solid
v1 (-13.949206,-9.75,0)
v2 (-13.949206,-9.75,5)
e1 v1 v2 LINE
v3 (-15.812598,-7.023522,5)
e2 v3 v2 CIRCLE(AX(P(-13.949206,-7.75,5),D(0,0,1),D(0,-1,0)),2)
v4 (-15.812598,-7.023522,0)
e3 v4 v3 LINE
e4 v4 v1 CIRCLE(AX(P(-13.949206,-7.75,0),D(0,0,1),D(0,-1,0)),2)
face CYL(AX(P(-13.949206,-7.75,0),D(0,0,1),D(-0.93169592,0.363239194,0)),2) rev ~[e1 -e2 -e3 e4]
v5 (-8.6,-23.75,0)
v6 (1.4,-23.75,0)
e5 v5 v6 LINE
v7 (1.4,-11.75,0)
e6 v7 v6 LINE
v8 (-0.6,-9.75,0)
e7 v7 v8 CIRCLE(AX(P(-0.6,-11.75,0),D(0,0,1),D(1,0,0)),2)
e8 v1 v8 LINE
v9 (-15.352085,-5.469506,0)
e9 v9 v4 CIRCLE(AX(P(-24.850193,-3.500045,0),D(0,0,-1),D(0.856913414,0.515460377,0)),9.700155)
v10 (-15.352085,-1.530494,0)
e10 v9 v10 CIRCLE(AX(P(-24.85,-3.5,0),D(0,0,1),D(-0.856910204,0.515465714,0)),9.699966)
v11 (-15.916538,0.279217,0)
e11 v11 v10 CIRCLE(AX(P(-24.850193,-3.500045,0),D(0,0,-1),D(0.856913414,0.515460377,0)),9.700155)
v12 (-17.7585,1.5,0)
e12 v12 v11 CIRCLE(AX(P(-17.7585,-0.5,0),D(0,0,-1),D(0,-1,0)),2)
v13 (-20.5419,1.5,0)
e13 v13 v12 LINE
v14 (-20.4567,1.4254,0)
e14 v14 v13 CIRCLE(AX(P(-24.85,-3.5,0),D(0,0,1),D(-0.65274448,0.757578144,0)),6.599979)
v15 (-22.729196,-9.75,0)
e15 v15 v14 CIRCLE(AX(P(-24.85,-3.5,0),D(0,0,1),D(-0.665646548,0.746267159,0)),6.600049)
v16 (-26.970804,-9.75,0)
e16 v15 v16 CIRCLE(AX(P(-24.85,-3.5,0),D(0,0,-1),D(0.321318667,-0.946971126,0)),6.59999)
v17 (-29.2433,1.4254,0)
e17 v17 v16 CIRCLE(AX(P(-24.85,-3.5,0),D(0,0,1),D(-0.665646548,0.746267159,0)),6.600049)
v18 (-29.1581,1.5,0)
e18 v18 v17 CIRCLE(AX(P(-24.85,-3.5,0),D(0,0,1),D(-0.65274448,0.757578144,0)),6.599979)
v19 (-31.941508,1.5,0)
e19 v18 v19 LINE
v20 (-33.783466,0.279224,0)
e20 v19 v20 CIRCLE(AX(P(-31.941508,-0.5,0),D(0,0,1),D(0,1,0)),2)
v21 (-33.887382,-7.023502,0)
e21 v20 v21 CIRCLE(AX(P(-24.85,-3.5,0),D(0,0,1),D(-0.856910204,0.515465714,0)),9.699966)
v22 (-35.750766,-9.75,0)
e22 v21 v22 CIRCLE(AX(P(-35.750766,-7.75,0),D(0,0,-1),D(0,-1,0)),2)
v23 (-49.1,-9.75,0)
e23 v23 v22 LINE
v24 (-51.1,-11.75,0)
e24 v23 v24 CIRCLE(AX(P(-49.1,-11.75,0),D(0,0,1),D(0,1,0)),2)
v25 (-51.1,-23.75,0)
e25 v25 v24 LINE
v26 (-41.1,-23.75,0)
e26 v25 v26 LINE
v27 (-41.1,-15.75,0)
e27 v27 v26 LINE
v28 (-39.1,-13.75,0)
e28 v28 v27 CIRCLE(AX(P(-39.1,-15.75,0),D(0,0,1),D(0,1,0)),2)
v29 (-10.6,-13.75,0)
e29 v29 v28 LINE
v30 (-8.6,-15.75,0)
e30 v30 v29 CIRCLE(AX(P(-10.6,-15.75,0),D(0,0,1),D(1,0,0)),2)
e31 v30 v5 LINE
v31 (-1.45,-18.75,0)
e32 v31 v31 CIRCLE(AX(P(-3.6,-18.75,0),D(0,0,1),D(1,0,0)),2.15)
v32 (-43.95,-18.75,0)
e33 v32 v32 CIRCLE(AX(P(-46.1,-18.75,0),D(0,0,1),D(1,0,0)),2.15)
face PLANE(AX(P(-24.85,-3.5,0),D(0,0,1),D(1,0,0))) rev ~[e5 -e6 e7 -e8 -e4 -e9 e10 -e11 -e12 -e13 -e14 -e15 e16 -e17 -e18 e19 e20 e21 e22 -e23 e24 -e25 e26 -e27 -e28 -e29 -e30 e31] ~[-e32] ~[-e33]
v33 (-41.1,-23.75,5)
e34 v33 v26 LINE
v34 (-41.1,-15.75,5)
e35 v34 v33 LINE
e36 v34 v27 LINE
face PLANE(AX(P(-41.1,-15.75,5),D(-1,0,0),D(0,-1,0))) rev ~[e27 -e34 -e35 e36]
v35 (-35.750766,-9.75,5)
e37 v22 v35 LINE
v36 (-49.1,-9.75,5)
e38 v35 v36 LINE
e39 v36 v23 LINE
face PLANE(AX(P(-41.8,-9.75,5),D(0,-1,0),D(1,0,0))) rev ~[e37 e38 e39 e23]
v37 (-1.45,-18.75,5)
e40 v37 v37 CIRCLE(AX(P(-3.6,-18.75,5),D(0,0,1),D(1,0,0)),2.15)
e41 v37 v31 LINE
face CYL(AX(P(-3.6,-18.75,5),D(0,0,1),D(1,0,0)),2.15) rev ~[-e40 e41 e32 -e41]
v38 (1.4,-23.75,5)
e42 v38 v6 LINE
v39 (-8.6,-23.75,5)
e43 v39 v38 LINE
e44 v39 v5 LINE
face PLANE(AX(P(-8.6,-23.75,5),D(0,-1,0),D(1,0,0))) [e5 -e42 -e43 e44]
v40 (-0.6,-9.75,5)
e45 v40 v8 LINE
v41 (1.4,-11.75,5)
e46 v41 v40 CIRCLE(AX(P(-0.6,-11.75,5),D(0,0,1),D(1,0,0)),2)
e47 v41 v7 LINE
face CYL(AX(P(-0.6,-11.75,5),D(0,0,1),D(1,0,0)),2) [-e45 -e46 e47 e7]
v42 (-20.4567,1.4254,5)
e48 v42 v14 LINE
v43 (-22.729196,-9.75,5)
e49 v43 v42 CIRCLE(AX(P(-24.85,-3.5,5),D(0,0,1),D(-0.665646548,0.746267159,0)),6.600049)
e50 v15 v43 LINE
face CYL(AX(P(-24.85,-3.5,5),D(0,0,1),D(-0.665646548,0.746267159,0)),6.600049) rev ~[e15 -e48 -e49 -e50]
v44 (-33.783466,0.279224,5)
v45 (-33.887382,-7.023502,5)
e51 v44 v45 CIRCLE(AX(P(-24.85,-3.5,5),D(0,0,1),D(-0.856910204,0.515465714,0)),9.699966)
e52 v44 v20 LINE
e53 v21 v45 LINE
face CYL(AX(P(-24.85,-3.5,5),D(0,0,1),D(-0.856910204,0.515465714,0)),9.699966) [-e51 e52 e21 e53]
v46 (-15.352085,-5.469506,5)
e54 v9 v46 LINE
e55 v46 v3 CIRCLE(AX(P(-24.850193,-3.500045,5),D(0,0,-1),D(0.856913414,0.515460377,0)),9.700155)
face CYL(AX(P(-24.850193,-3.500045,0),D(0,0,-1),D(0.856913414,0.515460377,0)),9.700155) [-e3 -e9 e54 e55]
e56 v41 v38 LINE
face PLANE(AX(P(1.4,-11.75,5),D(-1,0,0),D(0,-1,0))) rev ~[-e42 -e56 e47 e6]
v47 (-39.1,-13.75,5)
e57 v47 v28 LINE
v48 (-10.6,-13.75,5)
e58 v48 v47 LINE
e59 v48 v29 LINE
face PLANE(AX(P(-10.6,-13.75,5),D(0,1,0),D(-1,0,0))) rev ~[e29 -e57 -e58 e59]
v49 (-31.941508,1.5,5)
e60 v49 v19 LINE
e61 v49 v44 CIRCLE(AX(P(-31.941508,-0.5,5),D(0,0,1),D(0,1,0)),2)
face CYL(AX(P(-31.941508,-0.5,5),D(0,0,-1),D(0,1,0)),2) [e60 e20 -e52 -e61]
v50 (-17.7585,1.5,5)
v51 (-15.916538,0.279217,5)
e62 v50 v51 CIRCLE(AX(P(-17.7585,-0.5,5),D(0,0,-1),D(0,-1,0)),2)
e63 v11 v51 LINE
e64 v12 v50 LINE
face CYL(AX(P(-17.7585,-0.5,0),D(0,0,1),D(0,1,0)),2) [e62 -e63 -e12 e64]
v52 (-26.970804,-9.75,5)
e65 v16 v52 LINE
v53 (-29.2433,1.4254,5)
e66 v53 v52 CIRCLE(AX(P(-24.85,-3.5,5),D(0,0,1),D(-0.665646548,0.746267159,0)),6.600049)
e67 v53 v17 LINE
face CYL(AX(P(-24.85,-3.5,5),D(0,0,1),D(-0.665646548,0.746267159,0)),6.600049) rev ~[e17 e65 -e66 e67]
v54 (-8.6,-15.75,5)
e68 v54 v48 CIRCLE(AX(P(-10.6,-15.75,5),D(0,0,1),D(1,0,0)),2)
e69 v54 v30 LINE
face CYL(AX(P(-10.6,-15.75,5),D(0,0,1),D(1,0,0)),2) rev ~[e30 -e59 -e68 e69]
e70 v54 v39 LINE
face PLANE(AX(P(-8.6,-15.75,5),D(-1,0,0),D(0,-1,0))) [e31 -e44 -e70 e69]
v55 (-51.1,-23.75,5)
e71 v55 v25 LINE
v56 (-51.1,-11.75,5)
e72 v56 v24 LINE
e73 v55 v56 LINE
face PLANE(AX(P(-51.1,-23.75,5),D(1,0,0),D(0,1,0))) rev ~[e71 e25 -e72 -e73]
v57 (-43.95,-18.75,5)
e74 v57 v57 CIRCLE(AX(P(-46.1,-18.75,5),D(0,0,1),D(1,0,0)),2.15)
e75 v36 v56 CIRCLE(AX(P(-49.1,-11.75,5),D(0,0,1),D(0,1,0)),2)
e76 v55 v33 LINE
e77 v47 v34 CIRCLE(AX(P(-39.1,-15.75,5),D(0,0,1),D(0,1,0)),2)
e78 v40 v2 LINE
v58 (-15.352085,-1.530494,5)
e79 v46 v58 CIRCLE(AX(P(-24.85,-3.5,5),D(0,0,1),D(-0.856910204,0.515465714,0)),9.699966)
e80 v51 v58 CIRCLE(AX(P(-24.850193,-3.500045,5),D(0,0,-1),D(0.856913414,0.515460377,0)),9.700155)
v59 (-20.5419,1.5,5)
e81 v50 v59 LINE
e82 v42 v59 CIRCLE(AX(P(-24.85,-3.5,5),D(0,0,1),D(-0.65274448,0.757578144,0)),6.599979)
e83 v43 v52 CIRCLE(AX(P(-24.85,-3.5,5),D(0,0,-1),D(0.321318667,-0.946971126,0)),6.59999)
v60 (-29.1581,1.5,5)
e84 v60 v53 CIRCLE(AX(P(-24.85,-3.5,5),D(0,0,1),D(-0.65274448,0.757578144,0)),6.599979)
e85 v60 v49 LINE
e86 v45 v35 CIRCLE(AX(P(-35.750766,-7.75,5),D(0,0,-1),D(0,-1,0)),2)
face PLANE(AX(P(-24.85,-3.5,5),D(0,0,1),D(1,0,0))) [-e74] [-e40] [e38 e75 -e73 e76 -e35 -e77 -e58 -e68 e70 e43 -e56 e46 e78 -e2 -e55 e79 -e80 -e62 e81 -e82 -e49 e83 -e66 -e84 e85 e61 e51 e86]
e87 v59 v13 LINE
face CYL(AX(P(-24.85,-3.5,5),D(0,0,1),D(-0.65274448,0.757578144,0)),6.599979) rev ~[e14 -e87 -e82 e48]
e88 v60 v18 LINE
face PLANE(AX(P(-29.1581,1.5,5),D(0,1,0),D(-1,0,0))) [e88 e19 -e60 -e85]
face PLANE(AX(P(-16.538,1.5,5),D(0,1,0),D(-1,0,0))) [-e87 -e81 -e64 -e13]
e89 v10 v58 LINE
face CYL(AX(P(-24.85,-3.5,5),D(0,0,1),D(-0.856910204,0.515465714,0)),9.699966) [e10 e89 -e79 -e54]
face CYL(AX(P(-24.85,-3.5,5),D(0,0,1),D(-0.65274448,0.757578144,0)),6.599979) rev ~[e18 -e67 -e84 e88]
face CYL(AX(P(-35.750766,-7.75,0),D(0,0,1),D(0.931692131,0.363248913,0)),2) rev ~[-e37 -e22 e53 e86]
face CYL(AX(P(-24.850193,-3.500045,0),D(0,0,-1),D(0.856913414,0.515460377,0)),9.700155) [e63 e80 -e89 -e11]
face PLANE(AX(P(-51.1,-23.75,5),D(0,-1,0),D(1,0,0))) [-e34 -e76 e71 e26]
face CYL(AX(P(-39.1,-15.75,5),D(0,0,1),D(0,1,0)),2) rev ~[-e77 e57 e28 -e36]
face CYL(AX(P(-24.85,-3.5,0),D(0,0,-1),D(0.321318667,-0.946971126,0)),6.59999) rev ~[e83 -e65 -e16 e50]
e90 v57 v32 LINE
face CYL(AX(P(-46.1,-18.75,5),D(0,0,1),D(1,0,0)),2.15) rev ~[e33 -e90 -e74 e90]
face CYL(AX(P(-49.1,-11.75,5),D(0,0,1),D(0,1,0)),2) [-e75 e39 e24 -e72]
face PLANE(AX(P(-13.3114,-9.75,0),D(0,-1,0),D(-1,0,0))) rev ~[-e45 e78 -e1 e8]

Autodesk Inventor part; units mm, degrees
ref_plane "YZ Plane" through (0, 0, 0) normal (1, 0, 0) x (0, 1, 0)
ref_plane "XZ Plane" through (0, 0, 0) normal (0, 1, 0) x (-1, 0, 0)
ref_plane "Work Plane5" through (-24.85, -3.5, 5) normal (0, 0, 1) x (1, 0, 0)
sketch "Sketch16" plane through (-24.85, -3.5, 5) normal (0, 0, 1) x (1, 0, 0)
  circle A0 centre (0, 0) radius 6.5 construction
  arc A1 (-8.312, 5) -> (8.312, 5) centre (0, 0) ccw
  line L0 (9.7, 0) -> (-9.7, 0) construction
  line L1 (8.312, 5) -> (-8.312, 5)
  arc A2 (-4.3933, 4.9254) -> (4.3933, 4.9254) centre (0, 0) ccw
  arc A3 (-4.3081, 5) -> (4.3081, 5) centre (0, 0) ccw
  point P0 (24.85, 3.5)
  point P1 (4.4598, 5)
  point P2 (-4.4598, 5)
  dimension "d45" = 5
extrude "Extrusion16" add sketch "Sketch16" against normal blind 5 contours L1 A3 A2 A1
sketch "Sketch17" plane through (-24.85, -3.5, 5) normal (0, 0, 1) x (1, 0, 0)
  circle A0 centre (-21.25, -15.25) radius 2.15 projected
  circle A1 centre (21.25, -15.25) radius 2.15 projected
  arc A2 (-24.25, -6.25) -> (-26.25, -8.25) centre (-24.25, -8.25) ccw projected
  line L0 (-23.35, -6.25) -> (-24.25, -6.25) projected
  arc A3 (-23.35, -6.25) -> (-21.35, -4.25) centre (-23.35, -4.25) ccw projected
  line L1 (-21.35, -0.6245) -> (-21.35, -4.25) projected
  arc A4 (-21.35, -0.6245) -> (-21.35, 0.6245) centre (-19.45, 0) ccw projected
  line L2 (-21.35, 4.25) -> (-21.35, 0.6245) projected
  arc A5 (-19.35, 6.25) -> (-21.35, 4.25) centre (-19.35, 4.25) ccw projected
  line L3 (-19.35, 6.25) -> (-16.95, 6.25) projected
  line L4 (-16.95, 6.25) -> (-16.95, -6.25) projected
  line L5 (-16.95, -6.25) -> (6.65, -6.25) projected
  line L6 (6.65, -6.25) -> (6.65, 6.25) projected
  line L7 (6.65, 6.25) -> (9.05, 6.25) projected
  arc A6 (11.05, 4.25) -> (9.05, 6.25) centre (9.05, 4.25) ccw projected
  line L8 (11.05, 4.25) -> (11.05, 0.6245) projected
  arc A7 (11.05, 0.6245) -> (11.05, -0.6245) centre (9.15, 0) ccw projected
  line L9 (11.05, -0.6245) -> (11.05, -4.25) projected
  arc A8 (11.05, -4.25) -> (13.05, -6.25) centre (13.05, -4.25) ccw projected
  line L10 (13.05, -6.25) -> (24.25, -6.25) projected
  arc A9 (26.25, -8.25) -> (24.25, -6.25) centre (24.25, -8.25) ccw projected
  line L11 (26.25, -8.25) -> (26.25, -20.25) projected
  arc A10 (16.25, -12.25) -> (14.25, -10.25) centre (14.25, -12.25) ccw projected
  line L12 (14.25, -10.25) -> (-14.25, -10.25) projected
  arc A11 (-14.25, -10.25) -> (-16.25, -12.25) centre (-14.25, -12.25) ccw projected
  line L13 (-26.25, -20.25) -> (-26.25, -8.25) projected
  line L14 (-16.25, -12.25) -> (-16.25, -20.25) projected
  line L15 (-26.25, -20.25) -> (-16.25, -20.25) projected
  line L16 (16.25, -20.25) -> (26.25, -20.25) projected
  line L17 (16.25, -12.25) -> (16.25, -20.25) projected
  point P0 (24.85, 3.5)
extrude "Extrusion17" add sketch "Sketch17" against normal blind 5
sketch "Sketch18" plane through (-24.85, -3.5, 0) normal (0, 0, -1) x (-1, 0, 0)
  line L0 (16.95, -6.25) -> (7.4181, -6.25) projected
  line L1 (14.25, -6.25) -> (26.25, -6.25)
  line L2 (26.25, -6.25) -> (26.25, 6.25)
  line L3 (26.25, 6.25) -> (14.25, 6.25)
  line L4 (14.25, 6.25) -> (14.25, -6.25)
  point P0 (-24.85, 3.5)
extrude "Extrusion18" cut sketch "Sketch18" against normal blind 5
sketch "Sketch19" plane through (-24.85, -3.5, 0) normal (0, 0, -1) x (-1, 0, 0)
  line L0 (-4.4598, 5) -> (-15.1519, 5)
  line L1 (-15.1519, 5) -> (-15.1519, 7.7901)
  line L2 (-15.1519, 7.7901) -> (-4.4598, 7.7901)
  line L3 (-4.4598, 7.7901) -> (-4.4598, 5)
  point P0 (-24.85, 3.5)
extrude "Extrusion19" cut sketch "Sketch19" against normal blind 5
sketch "Sketch20" plane through (-24.85, -3.5, 0) normal (0, 0, -1) x (-1, 0, 0)
  line L0 (-4.3081, 5) -> (-10.904, 5) projected
  arc A0 (-13.05, -6.25) -> (-11.05, -4.25) centre (-13.05, -4.25) ccw projected
  line L1 (-14.25, -10.25) -> (14.25, -10.25) projected
  line L2 (24.25, -6.25) -> (7.4181, -6.25) projected
  line L3 (8.312, 5) -> (4.3081, 5) projected
  line L4 (-6.65, -0.817) -> (-6.65, 0.817) projected
  arc A1 (-4.4598, 5) -> (-6.65, 0.817) centre (0, 0) ccw projected
  line L5 (-7.14, 5) -> (-12.1327, 5)
  line L6 (-13.05, -6.25) -> (-7.4181, -6.25)
  arc A2 (-8.1939, -10.25) -> (11.5386, -6.25) centre (0, 0) ccw
  arc A3 (-12.1327, 5) -> (-11.5386, -6.25) centre (0, 0) ccw
  arc A4 (7.4181, -6.25) -> (8.312, 5) centre (0, 0) ccw
  arc A5 (-8.312, 5) -> (-7.4181, -6.25) centre (0, 0) ccw
  point P0 (4.4598, 5)
  point P1 (-24.85, 3.5)
extrude "Extrusion20" cut sketch "Sketch20" against normal blind 5 contours A5 L6 A3 L5 L0
sketch "Sketch21" plane through (-24.85, -3.5, 0) normal (0, 0, -1) x (-1, 0, 0)
  line L0 (-13.05, -6.25) -> (-24.25, -6.25) projected
  line L1 (-15.1128, -6.25) -> (-9.6695, -6.25)
  line L2 (-9.6695, -6.25) -> (-9.6695, -4.6771)
  line L3 (-9.6695, -4.6771) -> (-15.1128, -4.6771)
  line L4 (-15.1128, -4.6771) -> (-15.1128, -6.25)
  point P0 (-24.85, 3.5)
extrude "Extrusion21" cut sketch "Sketch21" against normal blind 5
fillet "Fillet2" radius 2 4 edges at (-17.4319, -9.75, 2.5) (-33.162, 1.5, 2.5) (-16.538, 1.5, 2.5) (-32.2681, -9.75, 2.5)
sketch "Sketch22" plane through (-24.85, -3.5, 0) normal (0, 0, -1) x (-1, 0, 0)
  line L0 (7.0915, 5) -> (4.3081, 5) projected
  line L1 (2.1207, -6.25) -> (-2.1207, -6.25) projected
  line L2 (-6.65, -0.817) -> (-6.65, 0.817) projected
  line L3 (-2.414, -6.25) -> (2.414, -6.25)
  arc A0 (-4.3081, 5) -> (-2.1207, -6.25) centre (0, 0) ccw construction
  arc A1 (2.1207, -6.25) -> (4.3081, 5) centre (0, 0) ccw construction
  arc A2 (-2.1207, -6.25) -> (2.1207, -6.25) centre (0, 0) ccw
  point P0 (4.4598, 5)
  point P1 (-24.85, 3.5)
extrude "Extrusion23" cut sketch "Sketch22" against normal blind 5
properties part number "BearingSupport"
